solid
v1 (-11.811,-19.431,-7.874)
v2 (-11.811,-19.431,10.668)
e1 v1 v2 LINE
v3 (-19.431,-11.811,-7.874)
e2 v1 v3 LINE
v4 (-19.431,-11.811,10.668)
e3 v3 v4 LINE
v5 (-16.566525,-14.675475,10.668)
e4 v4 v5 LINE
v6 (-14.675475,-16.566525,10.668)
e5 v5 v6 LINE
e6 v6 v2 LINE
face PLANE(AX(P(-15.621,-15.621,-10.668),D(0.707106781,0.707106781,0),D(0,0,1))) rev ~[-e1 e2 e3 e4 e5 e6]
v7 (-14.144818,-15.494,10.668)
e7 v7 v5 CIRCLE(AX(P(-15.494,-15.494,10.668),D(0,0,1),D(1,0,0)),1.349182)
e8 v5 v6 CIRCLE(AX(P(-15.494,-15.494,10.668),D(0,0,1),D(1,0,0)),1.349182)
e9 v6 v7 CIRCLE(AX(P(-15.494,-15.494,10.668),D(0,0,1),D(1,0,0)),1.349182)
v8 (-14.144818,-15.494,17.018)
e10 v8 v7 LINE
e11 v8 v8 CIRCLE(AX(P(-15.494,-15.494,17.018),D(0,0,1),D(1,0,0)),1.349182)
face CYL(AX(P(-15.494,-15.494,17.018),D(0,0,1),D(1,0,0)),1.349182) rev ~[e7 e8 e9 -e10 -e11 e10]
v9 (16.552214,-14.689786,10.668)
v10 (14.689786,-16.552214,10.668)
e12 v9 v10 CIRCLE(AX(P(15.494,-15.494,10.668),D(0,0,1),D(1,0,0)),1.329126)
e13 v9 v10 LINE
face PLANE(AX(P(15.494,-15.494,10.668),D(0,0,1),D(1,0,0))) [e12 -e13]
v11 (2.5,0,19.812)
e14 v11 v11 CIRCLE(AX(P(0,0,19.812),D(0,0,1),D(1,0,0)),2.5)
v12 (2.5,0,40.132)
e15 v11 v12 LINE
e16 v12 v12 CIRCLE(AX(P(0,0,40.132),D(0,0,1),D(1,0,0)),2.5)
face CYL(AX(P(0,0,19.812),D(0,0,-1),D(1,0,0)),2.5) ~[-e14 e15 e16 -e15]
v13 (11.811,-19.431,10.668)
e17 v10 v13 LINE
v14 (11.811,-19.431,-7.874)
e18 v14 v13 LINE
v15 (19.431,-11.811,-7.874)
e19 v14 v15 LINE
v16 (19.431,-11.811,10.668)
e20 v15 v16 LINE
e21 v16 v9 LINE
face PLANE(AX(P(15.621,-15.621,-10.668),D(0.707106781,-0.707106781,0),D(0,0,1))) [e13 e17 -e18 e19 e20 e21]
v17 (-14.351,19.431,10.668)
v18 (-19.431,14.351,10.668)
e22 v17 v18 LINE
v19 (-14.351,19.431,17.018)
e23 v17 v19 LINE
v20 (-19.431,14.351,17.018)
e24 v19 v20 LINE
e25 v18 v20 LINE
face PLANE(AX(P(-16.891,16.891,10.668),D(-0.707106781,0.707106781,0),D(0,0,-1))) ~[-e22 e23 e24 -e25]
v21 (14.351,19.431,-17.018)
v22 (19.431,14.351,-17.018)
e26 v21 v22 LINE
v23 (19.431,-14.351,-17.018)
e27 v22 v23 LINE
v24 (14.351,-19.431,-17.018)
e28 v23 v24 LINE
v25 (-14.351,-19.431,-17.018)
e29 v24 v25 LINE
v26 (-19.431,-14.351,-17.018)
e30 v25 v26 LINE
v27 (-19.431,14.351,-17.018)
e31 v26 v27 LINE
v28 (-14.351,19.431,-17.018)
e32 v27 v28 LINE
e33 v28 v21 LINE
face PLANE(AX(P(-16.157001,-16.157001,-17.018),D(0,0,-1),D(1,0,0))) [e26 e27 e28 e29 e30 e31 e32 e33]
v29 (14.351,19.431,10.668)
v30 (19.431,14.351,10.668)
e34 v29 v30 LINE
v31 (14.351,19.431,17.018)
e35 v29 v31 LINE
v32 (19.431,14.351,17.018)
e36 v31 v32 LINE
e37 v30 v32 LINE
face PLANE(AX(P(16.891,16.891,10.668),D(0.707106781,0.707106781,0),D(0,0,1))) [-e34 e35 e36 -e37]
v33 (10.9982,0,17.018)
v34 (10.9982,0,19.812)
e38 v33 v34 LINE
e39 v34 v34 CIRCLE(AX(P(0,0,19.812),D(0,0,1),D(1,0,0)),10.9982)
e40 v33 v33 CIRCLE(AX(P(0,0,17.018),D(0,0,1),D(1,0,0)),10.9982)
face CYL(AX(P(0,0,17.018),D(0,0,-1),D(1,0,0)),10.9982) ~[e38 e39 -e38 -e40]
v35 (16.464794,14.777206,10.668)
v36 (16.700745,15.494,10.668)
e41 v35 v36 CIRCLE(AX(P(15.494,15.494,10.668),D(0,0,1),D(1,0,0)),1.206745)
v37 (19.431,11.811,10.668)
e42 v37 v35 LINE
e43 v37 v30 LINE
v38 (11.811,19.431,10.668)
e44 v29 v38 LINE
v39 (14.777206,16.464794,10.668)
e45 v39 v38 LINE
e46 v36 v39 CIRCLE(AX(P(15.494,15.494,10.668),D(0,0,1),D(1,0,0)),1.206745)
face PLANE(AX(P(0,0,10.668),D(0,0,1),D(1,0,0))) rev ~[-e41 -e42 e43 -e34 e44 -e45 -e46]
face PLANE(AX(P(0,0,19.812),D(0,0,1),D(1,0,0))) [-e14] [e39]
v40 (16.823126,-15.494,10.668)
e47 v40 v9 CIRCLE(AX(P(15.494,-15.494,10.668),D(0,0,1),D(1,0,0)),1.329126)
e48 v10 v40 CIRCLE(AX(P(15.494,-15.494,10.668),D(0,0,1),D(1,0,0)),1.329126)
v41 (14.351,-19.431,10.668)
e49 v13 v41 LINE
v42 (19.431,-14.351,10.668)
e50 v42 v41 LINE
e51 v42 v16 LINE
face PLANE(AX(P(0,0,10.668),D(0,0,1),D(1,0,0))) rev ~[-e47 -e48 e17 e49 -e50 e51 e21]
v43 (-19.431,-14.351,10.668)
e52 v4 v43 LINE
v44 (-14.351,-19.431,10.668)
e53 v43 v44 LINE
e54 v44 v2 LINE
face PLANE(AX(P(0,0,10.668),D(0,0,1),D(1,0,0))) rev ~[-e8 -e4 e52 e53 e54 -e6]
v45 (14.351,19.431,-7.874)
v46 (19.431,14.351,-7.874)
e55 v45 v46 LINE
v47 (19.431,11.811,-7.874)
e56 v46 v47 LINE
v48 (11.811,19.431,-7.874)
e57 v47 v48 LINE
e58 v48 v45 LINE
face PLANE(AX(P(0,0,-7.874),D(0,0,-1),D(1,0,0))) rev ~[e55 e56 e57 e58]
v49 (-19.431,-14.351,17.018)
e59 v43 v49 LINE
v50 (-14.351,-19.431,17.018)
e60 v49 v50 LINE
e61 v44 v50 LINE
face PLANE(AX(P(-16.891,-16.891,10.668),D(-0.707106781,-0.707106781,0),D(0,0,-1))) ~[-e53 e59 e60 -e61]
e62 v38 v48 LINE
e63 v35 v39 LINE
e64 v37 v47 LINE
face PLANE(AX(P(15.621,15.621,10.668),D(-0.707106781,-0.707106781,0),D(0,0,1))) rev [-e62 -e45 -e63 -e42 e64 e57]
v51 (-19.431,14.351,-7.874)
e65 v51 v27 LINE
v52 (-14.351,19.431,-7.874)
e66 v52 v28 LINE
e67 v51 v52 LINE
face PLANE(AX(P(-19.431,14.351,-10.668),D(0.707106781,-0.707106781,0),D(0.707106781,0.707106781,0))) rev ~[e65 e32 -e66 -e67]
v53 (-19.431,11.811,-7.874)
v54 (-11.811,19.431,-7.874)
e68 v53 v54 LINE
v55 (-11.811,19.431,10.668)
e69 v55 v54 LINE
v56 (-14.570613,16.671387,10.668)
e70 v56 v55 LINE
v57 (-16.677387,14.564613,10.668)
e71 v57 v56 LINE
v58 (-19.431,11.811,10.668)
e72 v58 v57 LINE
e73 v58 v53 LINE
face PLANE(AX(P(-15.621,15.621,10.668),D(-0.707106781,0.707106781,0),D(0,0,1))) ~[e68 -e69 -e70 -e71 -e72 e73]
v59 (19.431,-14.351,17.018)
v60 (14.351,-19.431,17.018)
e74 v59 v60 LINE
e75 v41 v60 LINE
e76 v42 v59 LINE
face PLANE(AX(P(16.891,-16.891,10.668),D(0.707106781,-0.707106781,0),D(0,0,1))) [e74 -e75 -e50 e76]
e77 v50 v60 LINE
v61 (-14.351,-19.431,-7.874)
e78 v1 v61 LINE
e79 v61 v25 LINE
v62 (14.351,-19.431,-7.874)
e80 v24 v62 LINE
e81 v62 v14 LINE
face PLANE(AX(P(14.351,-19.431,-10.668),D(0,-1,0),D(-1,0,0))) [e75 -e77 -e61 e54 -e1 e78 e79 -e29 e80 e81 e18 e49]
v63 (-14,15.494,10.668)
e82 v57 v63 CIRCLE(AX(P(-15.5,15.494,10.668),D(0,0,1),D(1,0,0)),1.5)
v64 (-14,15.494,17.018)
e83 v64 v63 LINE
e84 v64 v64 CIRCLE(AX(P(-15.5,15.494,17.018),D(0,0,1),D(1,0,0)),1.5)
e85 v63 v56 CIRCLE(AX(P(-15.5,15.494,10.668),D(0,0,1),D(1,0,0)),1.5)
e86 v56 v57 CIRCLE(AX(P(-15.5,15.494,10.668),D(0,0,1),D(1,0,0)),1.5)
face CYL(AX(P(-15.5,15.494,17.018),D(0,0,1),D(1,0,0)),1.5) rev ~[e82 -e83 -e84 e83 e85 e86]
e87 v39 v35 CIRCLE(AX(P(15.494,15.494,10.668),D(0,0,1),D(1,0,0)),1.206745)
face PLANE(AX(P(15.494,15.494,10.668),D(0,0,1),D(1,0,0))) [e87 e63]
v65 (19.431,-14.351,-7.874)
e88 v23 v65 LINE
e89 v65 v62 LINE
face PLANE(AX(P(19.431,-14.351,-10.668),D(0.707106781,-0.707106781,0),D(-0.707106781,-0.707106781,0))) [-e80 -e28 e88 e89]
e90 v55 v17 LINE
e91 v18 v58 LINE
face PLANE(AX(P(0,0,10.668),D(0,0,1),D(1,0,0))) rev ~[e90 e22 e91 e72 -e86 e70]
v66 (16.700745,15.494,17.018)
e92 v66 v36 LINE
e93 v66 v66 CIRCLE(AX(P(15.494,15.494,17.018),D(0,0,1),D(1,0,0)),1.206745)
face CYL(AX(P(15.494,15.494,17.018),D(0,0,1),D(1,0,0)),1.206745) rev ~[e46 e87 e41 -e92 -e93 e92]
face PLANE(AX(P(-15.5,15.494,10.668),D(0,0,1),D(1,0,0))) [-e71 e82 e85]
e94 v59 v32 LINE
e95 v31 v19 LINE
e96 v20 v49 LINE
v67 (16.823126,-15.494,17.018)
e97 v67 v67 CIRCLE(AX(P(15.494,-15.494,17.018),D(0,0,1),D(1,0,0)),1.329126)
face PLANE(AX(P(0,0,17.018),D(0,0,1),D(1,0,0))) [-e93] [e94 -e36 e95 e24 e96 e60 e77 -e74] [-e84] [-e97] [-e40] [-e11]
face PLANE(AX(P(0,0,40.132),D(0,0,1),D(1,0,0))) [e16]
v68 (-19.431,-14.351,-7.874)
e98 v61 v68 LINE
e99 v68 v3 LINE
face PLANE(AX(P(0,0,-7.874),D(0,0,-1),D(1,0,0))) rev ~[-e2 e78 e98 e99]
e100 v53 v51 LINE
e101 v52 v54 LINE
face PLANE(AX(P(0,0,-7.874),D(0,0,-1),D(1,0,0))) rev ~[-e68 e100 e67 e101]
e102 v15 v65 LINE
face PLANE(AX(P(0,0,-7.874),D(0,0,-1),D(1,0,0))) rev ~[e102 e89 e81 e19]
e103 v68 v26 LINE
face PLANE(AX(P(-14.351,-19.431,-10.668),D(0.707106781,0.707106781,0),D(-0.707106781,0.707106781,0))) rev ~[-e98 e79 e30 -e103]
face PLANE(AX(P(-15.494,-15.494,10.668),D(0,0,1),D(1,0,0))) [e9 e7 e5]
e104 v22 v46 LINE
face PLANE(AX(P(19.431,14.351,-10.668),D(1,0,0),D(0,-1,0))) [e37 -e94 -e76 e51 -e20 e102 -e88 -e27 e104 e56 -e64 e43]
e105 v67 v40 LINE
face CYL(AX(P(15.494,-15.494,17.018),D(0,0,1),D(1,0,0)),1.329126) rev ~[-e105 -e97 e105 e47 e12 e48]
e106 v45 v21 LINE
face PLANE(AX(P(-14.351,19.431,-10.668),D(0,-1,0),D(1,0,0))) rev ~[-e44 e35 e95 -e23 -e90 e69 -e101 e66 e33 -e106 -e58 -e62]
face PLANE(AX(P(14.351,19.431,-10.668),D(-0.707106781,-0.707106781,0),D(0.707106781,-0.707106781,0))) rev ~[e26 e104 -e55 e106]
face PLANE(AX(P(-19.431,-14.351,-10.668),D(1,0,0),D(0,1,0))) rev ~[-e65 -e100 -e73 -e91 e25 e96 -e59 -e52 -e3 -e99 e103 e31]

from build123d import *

# Parameters (mm, degrees)
F0_W      = 38.862
F0_H      = 38.862
F1_DEPTH  = 10.668
F2_SIZE   = 7.62
F4_DEPTH  = 6.35
F5_SIZE   = 5.08
F7_DEPTH  = 6.35
F8_R      = 10.9982
F9_DEPTH  = 2.794
F10_R     = 2.5
F11_DEPTH = 20.32
F12_W     = 13.1343230445
F12_H     = 2.3335092461
F13_DEPTH = 10.16
F14_R     = 1.5
F14_R_2   = 1.2067449727
F14_R_3   = 1.3291263225
F14_R_4   = 1.3491824754
F15_DEPTH = 6.35


# Not quite as in the source:
# - a feature names something its author has since deleted; it is built from what else it names


with BuildPart() as f1:
    # F0 (on Top) → F1 (new body, symmetric)
    with BuildSketch(Plane.XY):
        Rectangle(F0_W, F0_H)
    extrude(amount=F1_DEPTH, both=True)

    # F2
    f2_edges = [f1.edges().sort_by_distance(p)[0] for p in [
        (19.431, 19.431, 0),
        (-19.431, 19.431, 0),
        (-19.431, -19.431, 0),
        (19.431, -19.431, 0),
    ]]
    chamfer(f2_edges, length=F2_SIZE)

    # F3 (on face) → F4 (join)
    with BuildSketch(Plane.XY.offset(10.668)):
        Polygon((11.811, 19.431), (-11.811, 19.431), (-19.431, 11.811), (-19.431, -11.811), (-11.811, -19.431), (11.811, -19.431), (19.431, -11.811), (19.431, 11.811), align=None)
        Polygon((19.431, 19.431), (11.811, 19.431), (19.431, 11.811), align=None)
        Polygon((-11.811, 19.431), (-19.431, 19.431), (-19.431, 11.811), align=None)
        Polygon((-11.811, -19.431), (-19.431, -11.811), (-19.431, -19.431), align=None)
        Polygon((19.431, -19.431), (19.431, -11.811), (11.811, -19.431), align=None)
    extrude(amount=F4_DEPTH)

    # F5
    f5_edges = [f1.edges().sort_by_distance(p)[0] for p in [
        (19.431, 19.431, 13.843),
        (-19.431, 19.431, 13.843),
        (-19.431, -19.431, 13.843),
        (19.431, -19.431, 13.843),
    ]]
    chamfer(f5_edges, length=F5_SIZE)

    # F6 (on face) → F7 (join)
    with BuildSketch(Plane(origin=(0, 0, -10.668), x_dir=(1, 0, 0), z_dir=(0, 0, -1))):
        Polygon((-11.811, 19.431), (-14.351, 19.431), (-19.431, 14.351), (-19.431, 11.811), align=None)
        Polygon((14.351, 19.431), (11.811, 19.431), (19.431, 11.811), (19.431, 14.351), align=None)
        Polygon((19.431, -14.351), (19.431, -11.811), (11.811, -19.431), (14.351, -19.431), align=None)
        Polygon((-11.811, -19.431), (-19.431, -11.811), (-19.431, -14.351), (-14.351, -19.431), align=None)
        Polygon((11.811, 19.431), (-11.811, 19.431), (-19.431, 11.811), (-19.431, -11.811), (-11.811, -19.431), (11.811, -19.431), (19.431, -11.811), (19.431, 11.811), align=None)
    extrude(amount=F7_DEPTH)

    # F8 (on face) + F6 (on face) → F9 (join)
    with BuildSketch(Plane.XY.offset(17.018)):
        Circle(F8_R)
    with BuildSketch(Plane(origin=(0, 0, -10.668), x_dir=(1, 0, 0), z_dir=(0, 0, -1))):
        Polygon((14.351, 19.431), (-14.351, 19.431), (-19.431, 14.351), (-19.431, -14.351), (-14.351, -19.431), (14.351, -19.431), (19.431, -14.351), (19.431, 14.351), align=None)
    extrude(amount=F9_DEPTH, dir=(0, 0, 1))

    # F10 (on face) → F11 (join)
    with BuildSketch(Plane.XY.offset(19.812)):
        Circle(F10_R)
    extrude(amount=F11_DEPTH)

    # F12 (on face) → F13 (cut)
    with BuildSketch(Plane.XY.offset(40.132)):
        with Locations((-0.0065014465, 6.166754623)):
            Rectangle(F12_W, F12_H)
    extrude(amount=-F13_DEPTH, mode=Mode.SUBTRACT)

    # F14 (on face) → F15 (cut)
    with BuildSketch(Plane.XY.offset(17.018)):
        with Locations((-15.5, 15.494)):
            Circle(F14_R)
        with Locations((15.494, 15.494)):
            Circle(F14_R_2)
        with Locations((15.494, -15.494)):
            Circle(F14_R_3)
        with Locations((-15.494, -15.494)):
            Circle(F14_R_4)
    extrude(amount=-F15_DEPTH, mode=Mode.SUBTRACT)


solid = f1.part
